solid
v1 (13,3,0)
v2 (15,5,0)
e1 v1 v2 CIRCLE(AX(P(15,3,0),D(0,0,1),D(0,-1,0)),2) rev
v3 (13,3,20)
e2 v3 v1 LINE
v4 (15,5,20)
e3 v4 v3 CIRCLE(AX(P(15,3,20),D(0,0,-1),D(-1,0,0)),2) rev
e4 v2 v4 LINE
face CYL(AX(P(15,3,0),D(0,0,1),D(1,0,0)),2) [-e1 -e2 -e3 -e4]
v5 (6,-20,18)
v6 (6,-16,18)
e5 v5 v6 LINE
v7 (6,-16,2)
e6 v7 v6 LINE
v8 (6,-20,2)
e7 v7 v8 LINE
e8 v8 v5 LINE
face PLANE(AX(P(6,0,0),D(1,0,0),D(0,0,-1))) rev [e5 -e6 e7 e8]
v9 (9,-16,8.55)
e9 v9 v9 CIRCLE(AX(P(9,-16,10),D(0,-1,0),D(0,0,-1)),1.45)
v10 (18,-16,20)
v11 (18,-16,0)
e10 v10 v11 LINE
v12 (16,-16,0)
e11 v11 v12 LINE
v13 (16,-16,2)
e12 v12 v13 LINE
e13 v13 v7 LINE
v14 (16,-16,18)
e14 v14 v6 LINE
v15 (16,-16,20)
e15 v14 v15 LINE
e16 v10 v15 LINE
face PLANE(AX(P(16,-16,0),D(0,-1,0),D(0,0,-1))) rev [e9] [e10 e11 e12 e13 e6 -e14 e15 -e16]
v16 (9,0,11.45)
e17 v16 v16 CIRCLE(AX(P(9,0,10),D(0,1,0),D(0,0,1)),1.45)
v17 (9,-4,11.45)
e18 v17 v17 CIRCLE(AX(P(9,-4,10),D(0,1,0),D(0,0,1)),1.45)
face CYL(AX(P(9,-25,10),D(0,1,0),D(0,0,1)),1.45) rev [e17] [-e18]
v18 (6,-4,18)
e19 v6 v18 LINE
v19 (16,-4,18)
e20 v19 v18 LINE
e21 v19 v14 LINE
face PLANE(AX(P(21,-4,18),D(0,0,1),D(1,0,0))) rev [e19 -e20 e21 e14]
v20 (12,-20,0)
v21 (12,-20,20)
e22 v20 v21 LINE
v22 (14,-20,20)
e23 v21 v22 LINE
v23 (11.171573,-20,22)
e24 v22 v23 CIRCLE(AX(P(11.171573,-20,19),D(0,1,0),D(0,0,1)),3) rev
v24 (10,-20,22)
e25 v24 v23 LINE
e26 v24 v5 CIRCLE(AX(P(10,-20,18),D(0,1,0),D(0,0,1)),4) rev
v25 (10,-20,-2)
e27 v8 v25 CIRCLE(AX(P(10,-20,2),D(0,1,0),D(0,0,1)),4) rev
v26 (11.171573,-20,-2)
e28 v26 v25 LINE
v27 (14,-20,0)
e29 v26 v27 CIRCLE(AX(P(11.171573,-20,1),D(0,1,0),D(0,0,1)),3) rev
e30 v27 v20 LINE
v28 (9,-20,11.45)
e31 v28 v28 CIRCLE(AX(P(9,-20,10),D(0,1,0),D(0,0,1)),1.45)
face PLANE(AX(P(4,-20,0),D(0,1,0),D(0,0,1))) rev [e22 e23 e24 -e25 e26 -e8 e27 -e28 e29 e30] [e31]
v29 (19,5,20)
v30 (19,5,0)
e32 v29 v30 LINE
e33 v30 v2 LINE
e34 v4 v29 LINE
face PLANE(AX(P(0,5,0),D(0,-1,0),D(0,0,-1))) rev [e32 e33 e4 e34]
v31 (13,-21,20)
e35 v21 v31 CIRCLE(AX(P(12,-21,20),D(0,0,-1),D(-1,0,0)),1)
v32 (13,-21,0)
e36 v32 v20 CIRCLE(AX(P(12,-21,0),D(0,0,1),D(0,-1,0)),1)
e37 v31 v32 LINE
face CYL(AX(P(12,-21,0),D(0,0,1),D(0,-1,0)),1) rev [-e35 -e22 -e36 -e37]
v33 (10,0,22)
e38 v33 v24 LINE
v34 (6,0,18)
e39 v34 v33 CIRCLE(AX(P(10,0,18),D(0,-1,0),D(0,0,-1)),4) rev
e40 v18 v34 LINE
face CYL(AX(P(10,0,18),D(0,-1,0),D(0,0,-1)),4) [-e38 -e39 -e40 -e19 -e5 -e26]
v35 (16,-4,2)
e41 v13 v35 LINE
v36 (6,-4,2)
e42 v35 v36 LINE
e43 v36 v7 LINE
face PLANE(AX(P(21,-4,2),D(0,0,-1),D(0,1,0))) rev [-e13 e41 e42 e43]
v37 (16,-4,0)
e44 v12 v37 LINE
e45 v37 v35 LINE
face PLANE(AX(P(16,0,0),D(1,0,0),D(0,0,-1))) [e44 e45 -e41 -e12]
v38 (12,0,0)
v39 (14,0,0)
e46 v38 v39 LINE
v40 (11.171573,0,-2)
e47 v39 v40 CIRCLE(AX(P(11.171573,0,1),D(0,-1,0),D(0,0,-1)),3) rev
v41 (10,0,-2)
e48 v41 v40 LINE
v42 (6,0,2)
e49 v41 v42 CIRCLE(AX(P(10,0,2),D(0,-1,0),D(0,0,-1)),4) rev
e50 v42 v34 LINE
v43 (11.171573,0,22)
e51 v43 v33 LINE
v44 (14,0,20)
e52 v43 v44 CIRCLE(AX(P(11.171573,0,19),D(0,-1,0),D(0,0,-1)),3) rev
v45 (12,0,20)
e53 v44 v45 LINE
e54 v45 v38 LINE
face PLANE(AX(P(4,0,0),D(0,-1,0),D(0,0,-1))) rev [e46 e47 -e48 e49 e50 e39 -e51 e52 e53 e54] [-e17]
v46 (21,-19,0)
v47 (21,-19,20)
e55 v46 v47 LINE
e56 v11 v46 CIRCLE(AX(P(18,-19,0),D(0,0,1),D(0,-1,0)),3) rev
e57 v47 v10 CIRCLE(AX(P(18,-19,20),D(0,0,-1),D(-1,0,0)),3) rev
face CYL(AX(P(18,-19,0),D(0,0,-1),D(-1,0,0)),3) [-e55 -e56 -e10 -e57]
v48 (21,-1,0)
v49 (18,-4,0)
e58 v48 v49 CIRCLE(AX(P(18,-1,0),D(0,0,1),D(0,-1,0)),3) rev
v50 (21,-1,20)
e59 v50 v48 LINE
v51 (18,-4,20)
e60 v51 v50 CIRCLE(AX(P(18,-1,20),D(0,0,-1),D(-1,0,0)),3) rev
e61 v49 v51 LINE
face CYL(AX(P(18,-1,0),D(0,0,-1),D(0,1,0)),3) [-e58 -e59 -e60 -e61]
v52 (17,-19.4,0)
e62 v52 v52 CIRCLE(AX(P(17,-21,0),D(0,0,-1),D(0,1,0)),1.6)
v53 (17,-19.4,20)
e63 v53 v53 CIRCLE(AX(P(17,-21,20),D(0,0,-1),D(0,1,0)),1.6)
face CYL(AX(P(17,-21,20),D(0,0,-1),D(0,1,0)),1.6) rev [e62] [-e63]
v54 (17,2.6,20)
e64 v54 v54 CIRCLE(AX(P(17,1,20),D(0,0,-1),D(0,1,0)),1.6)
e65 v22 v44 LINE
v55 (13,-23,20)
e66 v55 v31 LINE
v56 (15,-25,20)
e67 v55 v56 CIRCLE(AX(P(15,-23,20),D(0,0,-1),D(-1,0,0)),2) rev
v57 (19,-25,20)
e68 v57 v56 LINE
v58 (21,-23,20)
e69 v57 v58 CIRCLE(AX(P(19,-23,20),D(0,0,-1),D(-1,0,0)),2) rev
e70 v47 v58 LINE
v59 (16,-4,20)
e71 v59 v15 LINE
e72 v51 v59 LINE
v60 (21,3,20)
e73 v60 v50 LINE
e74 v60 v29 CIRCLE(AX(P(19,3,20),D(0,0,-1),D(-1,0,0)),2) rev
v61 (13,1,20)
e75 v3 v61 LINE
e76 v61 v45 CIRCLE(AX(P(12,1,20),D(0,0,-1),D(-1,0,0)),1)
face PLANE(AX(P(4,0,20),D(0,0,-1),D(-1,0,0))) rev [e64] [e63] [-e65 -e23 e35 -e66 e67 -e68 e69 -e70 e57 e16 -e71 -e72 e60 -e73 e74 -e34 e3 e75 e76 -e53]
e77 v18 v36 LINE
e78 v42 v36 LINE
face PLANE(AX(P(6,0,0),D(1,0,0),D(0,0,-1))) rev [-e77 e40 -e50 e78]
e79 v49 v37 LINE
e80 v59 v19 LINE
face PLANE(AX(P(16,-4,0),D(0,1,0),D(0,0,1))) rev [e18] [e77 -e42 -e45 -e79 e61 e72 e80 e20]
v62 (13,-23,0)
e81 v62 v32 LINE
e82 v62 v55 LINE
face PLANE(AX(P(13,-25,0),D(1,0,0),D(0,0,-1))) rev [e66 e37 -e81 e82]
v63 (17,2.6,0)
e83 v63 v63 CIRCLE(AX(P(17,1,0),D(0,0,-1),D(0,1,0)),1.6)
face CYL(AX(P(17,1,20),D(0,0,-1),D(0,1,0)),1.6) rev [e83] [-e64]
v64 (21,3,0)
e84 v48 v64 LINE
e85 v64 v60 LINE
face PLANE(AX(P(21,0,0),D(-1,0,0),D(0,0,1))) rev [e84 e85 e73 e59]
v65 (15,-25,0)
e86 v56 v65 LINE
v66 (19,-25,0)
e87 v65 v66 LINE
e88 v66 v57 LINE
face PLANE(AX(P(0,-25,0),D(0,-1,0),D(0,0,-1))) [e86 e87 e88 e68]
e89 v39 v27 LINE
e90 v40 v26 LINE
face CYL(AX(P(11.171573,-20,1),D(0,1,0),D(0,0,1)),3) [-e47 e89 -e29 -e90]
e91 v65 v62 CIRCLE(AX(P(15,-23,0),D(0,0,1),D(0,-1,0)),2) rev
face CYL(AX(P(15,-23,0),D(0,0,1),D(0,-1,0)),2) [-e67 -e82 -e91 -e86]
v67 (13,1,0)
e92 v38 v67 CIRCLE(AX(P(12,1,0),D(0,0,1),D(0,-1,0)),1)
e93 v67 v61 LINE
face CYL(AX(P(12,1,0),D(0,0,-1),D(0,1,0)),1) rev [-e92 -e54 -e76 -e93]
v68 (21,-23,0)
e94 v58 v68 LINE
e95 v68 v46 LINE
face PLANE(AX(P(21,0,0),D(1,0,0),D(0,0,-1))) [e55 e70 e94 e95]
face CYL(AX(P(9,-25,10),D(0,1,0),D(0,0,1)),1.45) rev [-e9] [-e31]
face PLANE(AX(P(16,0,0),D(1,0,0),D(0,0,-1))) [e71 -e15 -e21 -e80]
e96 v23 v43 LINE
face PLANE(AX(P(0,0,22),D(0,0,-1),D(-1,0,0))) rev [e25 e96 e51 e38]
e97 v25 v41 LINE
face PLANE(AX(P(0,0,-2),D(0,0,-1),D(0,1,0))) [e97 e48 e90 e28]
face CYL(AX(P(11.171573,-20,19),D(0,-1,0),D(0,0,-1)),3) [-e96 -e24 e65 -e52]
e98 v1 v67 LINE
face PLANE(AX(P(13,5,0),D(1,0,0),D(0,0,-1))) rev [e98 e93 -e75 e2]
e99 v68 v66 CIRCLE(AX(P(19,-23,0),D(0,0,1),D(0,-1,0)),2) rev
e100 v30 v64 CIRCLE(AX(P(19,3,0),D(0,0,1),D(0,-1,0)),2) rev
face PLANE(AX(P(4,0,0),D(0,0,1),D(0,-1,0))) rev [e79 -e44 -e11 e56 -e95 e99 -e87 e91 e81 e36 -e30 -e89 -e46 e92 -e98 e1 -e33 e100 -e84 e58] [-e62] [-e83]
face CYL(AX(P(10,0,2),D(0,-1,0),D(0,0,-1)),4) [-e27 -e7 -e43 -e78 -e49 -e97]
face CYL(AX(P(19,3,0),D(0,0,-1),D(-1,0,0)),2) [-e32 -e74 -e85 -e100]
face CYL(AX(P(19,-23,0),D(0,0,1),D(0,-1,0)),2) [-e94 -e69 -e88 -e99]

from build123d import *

# Parameters (mm, degrees)
SKETCH1_W           = 20
SKETCH1_H           = 20
BOSS_EXTRUDE1_DEPTH = 4
SKETCH2_R           = 3.7
CUT_EXTRUDE1_DEPTH  = 2.6
SKETCH3_R           = 2.1
CUT_EXTRUDE2_DEPTH  = 29.403520909
SKETCH4_W           = 12
SKETCH4_H           = 4
BOSS_EXTRUDE2_DEPTH = 12
SKETCH7_W           = 20
SKETCH7_H           = 4
BOSS_EXTRUDE3_DEPTH = 5
SKETCH8_W           = 8
SKETCH8_H           = 20
BOSS_EXTRUDE4_DEPTH = 5
SKETCH9_W           = 8
SKETCH9_H           = 20
BOSS_EXTRUDE5_DEPTH = 5
SKETCH10_R          = 1.6
CUT_EXTRUDE5_DEPTH  = 39.288379438
SKETCH11_W          = 30
SKETCH11_H          = 30
CUT_EXTRUDE6_DEPTH  = 6
SKETCH12_R          = 1.45
CUT_EXTRUDE7_DEPTH  = 39.288379438
SKETCH13_W          = 8
SKETCH13_H          = 20
BOSS_EXTRUDE6_DEPTH = 2
SKETCH14_W          = 8
SKETCH14_H          = 20
BOSS_EXTRUDE7_DEPTH = 2
SKETCH15_W          = 16
SKETCH15_H          = 12
CUT_EXTRUDE8_DEPTH  = 37.523964735
FILLET2_R           = 3
FILLET4_R           = 2
FILLET5_START       = -21
FILLET5_DEPTH       = 22
FILLET6_R           = 3
FILLET7_R           = 1
FILLET8_R           = 1


with BuildPart() as part:
    # Sketch1 → Boss-Extrude1 (new body)
    with BuildSketch(Plane(origin=(0, 0, 0), x_dir=(0, 0, -1), z_dir=(1, 0, 0))):
        with Locations((-10, -10)):
            Rectangle(SKETCH1_W, SKETCH1_H)
    extrude(amount=BOSS_EXTRUDE1_DEPTH)

    # Sketch2 → Cut-Extrude1 (cut)
    with BuildSketch(Plane(origin=(4, 0, 0), x_dir=(0, 0, -1), z_dir=(1, 0, 0))):
        with Locations((-10, -10)):
            Circle(SKETCH2_R)
    extrude(amount=-CUT_EXTRUDE1_DEPTH, mode=Mode.SUBTRACT)

    # Sketch3 → Cut-Extrude2 (cut, through all)
    with BuildSketch(Plane(origin=(1.4, 0, 0), x_dir=(0, 0, -1), z_dir=(1, 0, 0))):
        with Locations((-10, -10)):
            Circle(SKETCH3_R)
    extrude(amount=-CUT_EXTRUDE2_DEPTH, mode=Mode.SUBTRACT)

    # Sketch4 → Boss-Extrude2 (add)
    with BuildSketch(Plane(origin=(4, 0, 0), x_dir=(0, 0, -1), z_dir=(1, 0, 0))):
        Polygon((-20, 0), (-20, -20), (-16, -20), (-16, -16), (-16, -4), (-16, 0), align=None)
        with Locations((-10, -18)):
            Rectangle(SKETCH4_W, SKETCH4_H)
        Polygon((-4, -16), (-4, -20), (0, -20), (0, -4), (-4, -4), align=None)
        Polygon((0, 0), (-16, 0), (-16, -4), (-4, -4), (0, -4), align=None)
    extrude(amount=BOSS_EXTRUDE2_DEPTH)

    # Sketch7 → Boss-Extrude3 (add)
    with BuildSketch(Plane(origin=(16, 0, 0), x_dir=(0, 0, -1), z_dir=(1, 0, 0))):
        with Locations((-10, -18)):
            Rectangle(SKETCH7_W, SKETCH7_H)
        with Locations((-10, -2)):
            Rectangle(SKETCH7_W, SKETCH7_H)
    extrude(amount=BOSS_EXTRUDE3_DEPTH)

    # Sketch8 → Boss-Extrude4 (add)
    with BuildSketch(Plane(origin=(0, -20, 0), x_dir=(-1, 0, 0), z_dir=(0, -1, 0))):
        with Locations((-17, -10)):
            Rectangle(SKETCH8_W, SKETCH8_H)
    extrude(amount=BOSS_EXTRUDE4_DEPTH)

    # Sketch9 → Boss-Extrude5 (add)
    with BuildSketch(Plane(origin=(0, 0, 0), x_dir=(1, 0, 0), z_dir=(0, 1, 0))):
        with Locations((17, -10)):
            Rectangle(SKETCH9_W, SKETCH9_H)
    extrude(amount=BOSS_EXTRUDE5_DEPTH)

    # Sketch10 → Cut-Extrude5 (cut, through all)
    with BuildSketch(Plane(origin=(0, 0, 0), x_dir=(-1, 0, 0), z_dir=(0, 0, -1))):
        with Locations(Location((-17, 1, 0), (0, 0, 90))):
            Circle(SKETCH10_R)
        with Locations(Location((-17, -21, 0), (0, 0, 90))):
            Circle(SKETCH10_R)
    extrude(amount=-CUT_EXTRUDE5_DEPTH, mode=Mode.SUBTRACT)

    # Sketch11 → Cut-Extrude6 (cut)
    with BuildSketch(Plane.ZY):
        with Locations((15, -5)):
            Rectangle(SKETCH11_W, SKETCH11_H)
    extrude(amount=-CUT_EXTRUDE6_DEPTH, mode=Mode.SUBTRACT)

    # Sketch12 → Cut-Extrude7 (cut, through all)
    with BuildSketch(Plane(origin=(0, 0, 0), x_dir=(1, 0, 0), z_dir=(0, 1, 0))):
        with Locations(Location((9, -10, 0), (0, 0, 270))):
            Circle(SKETCH12_R)
    extrude(amount=-CUT_EXTRUDE7_DEPTH, mode=Mode.SUBTRACT)

    # Sketch13 → Boss-Extrude6 (add)
    with BuildSketch(Plane.XY.offset(20)):
        with Locations((10, -10)):
            Rectangle(SKETCH13_W, SKETCH13_H)
    extrude(amount=BOSS_EXTRUDE6_DEPTH)

    # Sketch14 → Boss-Extrude7 (add)
    with BuildSketch(Plane(origin=(0, 0, 0), x_dir=(-1, 0, 0), z_dir=(0, 0, -1))):
        with Locations((-10, -10)):
            Rectangle(SKETCH14_W, SKETCH14_H)
    extrude(amount=BOSS_EXTRUDE7_DEPTH)

    # Sketch15 → Cut-Extrude8 (cut, through all)
    with BuildSketch(Plane.ZY.offset(-6)):
        with Locations((10, -10)):
            Rectangle(SKETCH15_W, SKETCH15_H)
    extrude(amount=-CUT_EXTRUDE8_DEPTH, mode=Mode.SUBTRACT)

    # Fillet2
    fillet2_edges = [part.edges().sort_by_distance(p)[0] for p in [
        (21, -16, 10),
        (21, -4, 10),
    ]]
    fillet(fillet2_edges, radius=FILLET2_R)

    # Fillet4
    fillet4_edges = [part.edges().sort_by_distance(p)[0] for p in [
        (21, -25, 10),
        (13, -25, 10),
        (21, 5, 10),
        (13, 5, 10),
    ]]
    fillet(fillet4_edges, radius=FILLET4_R)

    # Fillet5: read off the stored shape, not the designer's step
    # Fillet5 outline → Fillet5 (cut)
    with BuildSketch(Plane(origin=(0, 0, 0), x_dir=(1, 0, 0), z_dir=(0, 1, 0)).offset(FILLET5_START)):
        with BuildLine():
            Line((6, 2), (6, -2))
            ThreePointArc((6, -2), (7.171572875, 0.828427125), (10, 2))
            Line((10, 2), (6, 2))
        make_face()
        with BuildLine():
            ThreePointArc((10, -22), (7.171572875, -20.828427125), (6, -18))
            Line((6, -18), (6, -22))
            Line((6, -22), (10, -22))
        make_face()
    extrude(amount=FILLET5_DEPTH, mode=Mode.SUBTRACT)

    # Fillet6
    # the kernel refuses this fillet: 3 mm, written as the material it takes off along each edge
    with BuildSketch(Plane(origin=(14, -27.071067812, -2), x_dir=(-1, 0, 0), z_dir=(0, 1, 0))) as fillet6_piece_1:
        with BuildLine():
            CenterArc((2.828427125, 3), FILLET6_R, 199.471220634, 70.528779366)
            Line((0, 2), (-0.056568542, 1.98))
            ThreePointArc((-0.056568542, 1.98), (-0.06, 1), (-0.06, 0))
            Line((-0.06, 0), (0, -0.06))
            Line((0, -0.06), (2.828427125, -0.06))
            Line((2.828427125, -0.06), (2.828427125, 0))
        make_face()
    extrude(amount=34.142135624, mode=Mode.SUBTRACT)
    with BuildSketch(Plane(origin=(14, -27.071067812, 22), x_dir=(0, 0, -1), z_dir=(0, 1, 0))) as fillet6_piece_2:
        with BuildLine():
            CenterArc((3, 2.828427125), FILLET6_R, 180, 70.528779366)
            Line((0, 2.828427125), (-0.06, 2.828427125))
            Line((-0.06, 2.828427125), (-0.06, 0))
            Line((-0.06, 0), (0, -0.06))
            ThreePointArc((0, -0.06), (1, -0.06), (1.98, -0.056568542))
            Line((1.98, -0.056568542), (2, 0))
        make_face()
    extrude(amount=34.142135624, mode=Mode.SUBTRACT)

    # Fillet7
    fillet7_edges = [part.edges().sort_by_distance(p)[0] for p in [
        (13, -20, 10),
    ]]
    fillet(fillet7_edges, radius=FILLET7_R)

    # Fillet8
    fillet8_edges = [part.edges().sort_by_distance(p)[0] for p in [
        (13, 0, 10),
    ]]
    fillet(fillet8_edges, radius=FILLET8_R)


solid = part.part
